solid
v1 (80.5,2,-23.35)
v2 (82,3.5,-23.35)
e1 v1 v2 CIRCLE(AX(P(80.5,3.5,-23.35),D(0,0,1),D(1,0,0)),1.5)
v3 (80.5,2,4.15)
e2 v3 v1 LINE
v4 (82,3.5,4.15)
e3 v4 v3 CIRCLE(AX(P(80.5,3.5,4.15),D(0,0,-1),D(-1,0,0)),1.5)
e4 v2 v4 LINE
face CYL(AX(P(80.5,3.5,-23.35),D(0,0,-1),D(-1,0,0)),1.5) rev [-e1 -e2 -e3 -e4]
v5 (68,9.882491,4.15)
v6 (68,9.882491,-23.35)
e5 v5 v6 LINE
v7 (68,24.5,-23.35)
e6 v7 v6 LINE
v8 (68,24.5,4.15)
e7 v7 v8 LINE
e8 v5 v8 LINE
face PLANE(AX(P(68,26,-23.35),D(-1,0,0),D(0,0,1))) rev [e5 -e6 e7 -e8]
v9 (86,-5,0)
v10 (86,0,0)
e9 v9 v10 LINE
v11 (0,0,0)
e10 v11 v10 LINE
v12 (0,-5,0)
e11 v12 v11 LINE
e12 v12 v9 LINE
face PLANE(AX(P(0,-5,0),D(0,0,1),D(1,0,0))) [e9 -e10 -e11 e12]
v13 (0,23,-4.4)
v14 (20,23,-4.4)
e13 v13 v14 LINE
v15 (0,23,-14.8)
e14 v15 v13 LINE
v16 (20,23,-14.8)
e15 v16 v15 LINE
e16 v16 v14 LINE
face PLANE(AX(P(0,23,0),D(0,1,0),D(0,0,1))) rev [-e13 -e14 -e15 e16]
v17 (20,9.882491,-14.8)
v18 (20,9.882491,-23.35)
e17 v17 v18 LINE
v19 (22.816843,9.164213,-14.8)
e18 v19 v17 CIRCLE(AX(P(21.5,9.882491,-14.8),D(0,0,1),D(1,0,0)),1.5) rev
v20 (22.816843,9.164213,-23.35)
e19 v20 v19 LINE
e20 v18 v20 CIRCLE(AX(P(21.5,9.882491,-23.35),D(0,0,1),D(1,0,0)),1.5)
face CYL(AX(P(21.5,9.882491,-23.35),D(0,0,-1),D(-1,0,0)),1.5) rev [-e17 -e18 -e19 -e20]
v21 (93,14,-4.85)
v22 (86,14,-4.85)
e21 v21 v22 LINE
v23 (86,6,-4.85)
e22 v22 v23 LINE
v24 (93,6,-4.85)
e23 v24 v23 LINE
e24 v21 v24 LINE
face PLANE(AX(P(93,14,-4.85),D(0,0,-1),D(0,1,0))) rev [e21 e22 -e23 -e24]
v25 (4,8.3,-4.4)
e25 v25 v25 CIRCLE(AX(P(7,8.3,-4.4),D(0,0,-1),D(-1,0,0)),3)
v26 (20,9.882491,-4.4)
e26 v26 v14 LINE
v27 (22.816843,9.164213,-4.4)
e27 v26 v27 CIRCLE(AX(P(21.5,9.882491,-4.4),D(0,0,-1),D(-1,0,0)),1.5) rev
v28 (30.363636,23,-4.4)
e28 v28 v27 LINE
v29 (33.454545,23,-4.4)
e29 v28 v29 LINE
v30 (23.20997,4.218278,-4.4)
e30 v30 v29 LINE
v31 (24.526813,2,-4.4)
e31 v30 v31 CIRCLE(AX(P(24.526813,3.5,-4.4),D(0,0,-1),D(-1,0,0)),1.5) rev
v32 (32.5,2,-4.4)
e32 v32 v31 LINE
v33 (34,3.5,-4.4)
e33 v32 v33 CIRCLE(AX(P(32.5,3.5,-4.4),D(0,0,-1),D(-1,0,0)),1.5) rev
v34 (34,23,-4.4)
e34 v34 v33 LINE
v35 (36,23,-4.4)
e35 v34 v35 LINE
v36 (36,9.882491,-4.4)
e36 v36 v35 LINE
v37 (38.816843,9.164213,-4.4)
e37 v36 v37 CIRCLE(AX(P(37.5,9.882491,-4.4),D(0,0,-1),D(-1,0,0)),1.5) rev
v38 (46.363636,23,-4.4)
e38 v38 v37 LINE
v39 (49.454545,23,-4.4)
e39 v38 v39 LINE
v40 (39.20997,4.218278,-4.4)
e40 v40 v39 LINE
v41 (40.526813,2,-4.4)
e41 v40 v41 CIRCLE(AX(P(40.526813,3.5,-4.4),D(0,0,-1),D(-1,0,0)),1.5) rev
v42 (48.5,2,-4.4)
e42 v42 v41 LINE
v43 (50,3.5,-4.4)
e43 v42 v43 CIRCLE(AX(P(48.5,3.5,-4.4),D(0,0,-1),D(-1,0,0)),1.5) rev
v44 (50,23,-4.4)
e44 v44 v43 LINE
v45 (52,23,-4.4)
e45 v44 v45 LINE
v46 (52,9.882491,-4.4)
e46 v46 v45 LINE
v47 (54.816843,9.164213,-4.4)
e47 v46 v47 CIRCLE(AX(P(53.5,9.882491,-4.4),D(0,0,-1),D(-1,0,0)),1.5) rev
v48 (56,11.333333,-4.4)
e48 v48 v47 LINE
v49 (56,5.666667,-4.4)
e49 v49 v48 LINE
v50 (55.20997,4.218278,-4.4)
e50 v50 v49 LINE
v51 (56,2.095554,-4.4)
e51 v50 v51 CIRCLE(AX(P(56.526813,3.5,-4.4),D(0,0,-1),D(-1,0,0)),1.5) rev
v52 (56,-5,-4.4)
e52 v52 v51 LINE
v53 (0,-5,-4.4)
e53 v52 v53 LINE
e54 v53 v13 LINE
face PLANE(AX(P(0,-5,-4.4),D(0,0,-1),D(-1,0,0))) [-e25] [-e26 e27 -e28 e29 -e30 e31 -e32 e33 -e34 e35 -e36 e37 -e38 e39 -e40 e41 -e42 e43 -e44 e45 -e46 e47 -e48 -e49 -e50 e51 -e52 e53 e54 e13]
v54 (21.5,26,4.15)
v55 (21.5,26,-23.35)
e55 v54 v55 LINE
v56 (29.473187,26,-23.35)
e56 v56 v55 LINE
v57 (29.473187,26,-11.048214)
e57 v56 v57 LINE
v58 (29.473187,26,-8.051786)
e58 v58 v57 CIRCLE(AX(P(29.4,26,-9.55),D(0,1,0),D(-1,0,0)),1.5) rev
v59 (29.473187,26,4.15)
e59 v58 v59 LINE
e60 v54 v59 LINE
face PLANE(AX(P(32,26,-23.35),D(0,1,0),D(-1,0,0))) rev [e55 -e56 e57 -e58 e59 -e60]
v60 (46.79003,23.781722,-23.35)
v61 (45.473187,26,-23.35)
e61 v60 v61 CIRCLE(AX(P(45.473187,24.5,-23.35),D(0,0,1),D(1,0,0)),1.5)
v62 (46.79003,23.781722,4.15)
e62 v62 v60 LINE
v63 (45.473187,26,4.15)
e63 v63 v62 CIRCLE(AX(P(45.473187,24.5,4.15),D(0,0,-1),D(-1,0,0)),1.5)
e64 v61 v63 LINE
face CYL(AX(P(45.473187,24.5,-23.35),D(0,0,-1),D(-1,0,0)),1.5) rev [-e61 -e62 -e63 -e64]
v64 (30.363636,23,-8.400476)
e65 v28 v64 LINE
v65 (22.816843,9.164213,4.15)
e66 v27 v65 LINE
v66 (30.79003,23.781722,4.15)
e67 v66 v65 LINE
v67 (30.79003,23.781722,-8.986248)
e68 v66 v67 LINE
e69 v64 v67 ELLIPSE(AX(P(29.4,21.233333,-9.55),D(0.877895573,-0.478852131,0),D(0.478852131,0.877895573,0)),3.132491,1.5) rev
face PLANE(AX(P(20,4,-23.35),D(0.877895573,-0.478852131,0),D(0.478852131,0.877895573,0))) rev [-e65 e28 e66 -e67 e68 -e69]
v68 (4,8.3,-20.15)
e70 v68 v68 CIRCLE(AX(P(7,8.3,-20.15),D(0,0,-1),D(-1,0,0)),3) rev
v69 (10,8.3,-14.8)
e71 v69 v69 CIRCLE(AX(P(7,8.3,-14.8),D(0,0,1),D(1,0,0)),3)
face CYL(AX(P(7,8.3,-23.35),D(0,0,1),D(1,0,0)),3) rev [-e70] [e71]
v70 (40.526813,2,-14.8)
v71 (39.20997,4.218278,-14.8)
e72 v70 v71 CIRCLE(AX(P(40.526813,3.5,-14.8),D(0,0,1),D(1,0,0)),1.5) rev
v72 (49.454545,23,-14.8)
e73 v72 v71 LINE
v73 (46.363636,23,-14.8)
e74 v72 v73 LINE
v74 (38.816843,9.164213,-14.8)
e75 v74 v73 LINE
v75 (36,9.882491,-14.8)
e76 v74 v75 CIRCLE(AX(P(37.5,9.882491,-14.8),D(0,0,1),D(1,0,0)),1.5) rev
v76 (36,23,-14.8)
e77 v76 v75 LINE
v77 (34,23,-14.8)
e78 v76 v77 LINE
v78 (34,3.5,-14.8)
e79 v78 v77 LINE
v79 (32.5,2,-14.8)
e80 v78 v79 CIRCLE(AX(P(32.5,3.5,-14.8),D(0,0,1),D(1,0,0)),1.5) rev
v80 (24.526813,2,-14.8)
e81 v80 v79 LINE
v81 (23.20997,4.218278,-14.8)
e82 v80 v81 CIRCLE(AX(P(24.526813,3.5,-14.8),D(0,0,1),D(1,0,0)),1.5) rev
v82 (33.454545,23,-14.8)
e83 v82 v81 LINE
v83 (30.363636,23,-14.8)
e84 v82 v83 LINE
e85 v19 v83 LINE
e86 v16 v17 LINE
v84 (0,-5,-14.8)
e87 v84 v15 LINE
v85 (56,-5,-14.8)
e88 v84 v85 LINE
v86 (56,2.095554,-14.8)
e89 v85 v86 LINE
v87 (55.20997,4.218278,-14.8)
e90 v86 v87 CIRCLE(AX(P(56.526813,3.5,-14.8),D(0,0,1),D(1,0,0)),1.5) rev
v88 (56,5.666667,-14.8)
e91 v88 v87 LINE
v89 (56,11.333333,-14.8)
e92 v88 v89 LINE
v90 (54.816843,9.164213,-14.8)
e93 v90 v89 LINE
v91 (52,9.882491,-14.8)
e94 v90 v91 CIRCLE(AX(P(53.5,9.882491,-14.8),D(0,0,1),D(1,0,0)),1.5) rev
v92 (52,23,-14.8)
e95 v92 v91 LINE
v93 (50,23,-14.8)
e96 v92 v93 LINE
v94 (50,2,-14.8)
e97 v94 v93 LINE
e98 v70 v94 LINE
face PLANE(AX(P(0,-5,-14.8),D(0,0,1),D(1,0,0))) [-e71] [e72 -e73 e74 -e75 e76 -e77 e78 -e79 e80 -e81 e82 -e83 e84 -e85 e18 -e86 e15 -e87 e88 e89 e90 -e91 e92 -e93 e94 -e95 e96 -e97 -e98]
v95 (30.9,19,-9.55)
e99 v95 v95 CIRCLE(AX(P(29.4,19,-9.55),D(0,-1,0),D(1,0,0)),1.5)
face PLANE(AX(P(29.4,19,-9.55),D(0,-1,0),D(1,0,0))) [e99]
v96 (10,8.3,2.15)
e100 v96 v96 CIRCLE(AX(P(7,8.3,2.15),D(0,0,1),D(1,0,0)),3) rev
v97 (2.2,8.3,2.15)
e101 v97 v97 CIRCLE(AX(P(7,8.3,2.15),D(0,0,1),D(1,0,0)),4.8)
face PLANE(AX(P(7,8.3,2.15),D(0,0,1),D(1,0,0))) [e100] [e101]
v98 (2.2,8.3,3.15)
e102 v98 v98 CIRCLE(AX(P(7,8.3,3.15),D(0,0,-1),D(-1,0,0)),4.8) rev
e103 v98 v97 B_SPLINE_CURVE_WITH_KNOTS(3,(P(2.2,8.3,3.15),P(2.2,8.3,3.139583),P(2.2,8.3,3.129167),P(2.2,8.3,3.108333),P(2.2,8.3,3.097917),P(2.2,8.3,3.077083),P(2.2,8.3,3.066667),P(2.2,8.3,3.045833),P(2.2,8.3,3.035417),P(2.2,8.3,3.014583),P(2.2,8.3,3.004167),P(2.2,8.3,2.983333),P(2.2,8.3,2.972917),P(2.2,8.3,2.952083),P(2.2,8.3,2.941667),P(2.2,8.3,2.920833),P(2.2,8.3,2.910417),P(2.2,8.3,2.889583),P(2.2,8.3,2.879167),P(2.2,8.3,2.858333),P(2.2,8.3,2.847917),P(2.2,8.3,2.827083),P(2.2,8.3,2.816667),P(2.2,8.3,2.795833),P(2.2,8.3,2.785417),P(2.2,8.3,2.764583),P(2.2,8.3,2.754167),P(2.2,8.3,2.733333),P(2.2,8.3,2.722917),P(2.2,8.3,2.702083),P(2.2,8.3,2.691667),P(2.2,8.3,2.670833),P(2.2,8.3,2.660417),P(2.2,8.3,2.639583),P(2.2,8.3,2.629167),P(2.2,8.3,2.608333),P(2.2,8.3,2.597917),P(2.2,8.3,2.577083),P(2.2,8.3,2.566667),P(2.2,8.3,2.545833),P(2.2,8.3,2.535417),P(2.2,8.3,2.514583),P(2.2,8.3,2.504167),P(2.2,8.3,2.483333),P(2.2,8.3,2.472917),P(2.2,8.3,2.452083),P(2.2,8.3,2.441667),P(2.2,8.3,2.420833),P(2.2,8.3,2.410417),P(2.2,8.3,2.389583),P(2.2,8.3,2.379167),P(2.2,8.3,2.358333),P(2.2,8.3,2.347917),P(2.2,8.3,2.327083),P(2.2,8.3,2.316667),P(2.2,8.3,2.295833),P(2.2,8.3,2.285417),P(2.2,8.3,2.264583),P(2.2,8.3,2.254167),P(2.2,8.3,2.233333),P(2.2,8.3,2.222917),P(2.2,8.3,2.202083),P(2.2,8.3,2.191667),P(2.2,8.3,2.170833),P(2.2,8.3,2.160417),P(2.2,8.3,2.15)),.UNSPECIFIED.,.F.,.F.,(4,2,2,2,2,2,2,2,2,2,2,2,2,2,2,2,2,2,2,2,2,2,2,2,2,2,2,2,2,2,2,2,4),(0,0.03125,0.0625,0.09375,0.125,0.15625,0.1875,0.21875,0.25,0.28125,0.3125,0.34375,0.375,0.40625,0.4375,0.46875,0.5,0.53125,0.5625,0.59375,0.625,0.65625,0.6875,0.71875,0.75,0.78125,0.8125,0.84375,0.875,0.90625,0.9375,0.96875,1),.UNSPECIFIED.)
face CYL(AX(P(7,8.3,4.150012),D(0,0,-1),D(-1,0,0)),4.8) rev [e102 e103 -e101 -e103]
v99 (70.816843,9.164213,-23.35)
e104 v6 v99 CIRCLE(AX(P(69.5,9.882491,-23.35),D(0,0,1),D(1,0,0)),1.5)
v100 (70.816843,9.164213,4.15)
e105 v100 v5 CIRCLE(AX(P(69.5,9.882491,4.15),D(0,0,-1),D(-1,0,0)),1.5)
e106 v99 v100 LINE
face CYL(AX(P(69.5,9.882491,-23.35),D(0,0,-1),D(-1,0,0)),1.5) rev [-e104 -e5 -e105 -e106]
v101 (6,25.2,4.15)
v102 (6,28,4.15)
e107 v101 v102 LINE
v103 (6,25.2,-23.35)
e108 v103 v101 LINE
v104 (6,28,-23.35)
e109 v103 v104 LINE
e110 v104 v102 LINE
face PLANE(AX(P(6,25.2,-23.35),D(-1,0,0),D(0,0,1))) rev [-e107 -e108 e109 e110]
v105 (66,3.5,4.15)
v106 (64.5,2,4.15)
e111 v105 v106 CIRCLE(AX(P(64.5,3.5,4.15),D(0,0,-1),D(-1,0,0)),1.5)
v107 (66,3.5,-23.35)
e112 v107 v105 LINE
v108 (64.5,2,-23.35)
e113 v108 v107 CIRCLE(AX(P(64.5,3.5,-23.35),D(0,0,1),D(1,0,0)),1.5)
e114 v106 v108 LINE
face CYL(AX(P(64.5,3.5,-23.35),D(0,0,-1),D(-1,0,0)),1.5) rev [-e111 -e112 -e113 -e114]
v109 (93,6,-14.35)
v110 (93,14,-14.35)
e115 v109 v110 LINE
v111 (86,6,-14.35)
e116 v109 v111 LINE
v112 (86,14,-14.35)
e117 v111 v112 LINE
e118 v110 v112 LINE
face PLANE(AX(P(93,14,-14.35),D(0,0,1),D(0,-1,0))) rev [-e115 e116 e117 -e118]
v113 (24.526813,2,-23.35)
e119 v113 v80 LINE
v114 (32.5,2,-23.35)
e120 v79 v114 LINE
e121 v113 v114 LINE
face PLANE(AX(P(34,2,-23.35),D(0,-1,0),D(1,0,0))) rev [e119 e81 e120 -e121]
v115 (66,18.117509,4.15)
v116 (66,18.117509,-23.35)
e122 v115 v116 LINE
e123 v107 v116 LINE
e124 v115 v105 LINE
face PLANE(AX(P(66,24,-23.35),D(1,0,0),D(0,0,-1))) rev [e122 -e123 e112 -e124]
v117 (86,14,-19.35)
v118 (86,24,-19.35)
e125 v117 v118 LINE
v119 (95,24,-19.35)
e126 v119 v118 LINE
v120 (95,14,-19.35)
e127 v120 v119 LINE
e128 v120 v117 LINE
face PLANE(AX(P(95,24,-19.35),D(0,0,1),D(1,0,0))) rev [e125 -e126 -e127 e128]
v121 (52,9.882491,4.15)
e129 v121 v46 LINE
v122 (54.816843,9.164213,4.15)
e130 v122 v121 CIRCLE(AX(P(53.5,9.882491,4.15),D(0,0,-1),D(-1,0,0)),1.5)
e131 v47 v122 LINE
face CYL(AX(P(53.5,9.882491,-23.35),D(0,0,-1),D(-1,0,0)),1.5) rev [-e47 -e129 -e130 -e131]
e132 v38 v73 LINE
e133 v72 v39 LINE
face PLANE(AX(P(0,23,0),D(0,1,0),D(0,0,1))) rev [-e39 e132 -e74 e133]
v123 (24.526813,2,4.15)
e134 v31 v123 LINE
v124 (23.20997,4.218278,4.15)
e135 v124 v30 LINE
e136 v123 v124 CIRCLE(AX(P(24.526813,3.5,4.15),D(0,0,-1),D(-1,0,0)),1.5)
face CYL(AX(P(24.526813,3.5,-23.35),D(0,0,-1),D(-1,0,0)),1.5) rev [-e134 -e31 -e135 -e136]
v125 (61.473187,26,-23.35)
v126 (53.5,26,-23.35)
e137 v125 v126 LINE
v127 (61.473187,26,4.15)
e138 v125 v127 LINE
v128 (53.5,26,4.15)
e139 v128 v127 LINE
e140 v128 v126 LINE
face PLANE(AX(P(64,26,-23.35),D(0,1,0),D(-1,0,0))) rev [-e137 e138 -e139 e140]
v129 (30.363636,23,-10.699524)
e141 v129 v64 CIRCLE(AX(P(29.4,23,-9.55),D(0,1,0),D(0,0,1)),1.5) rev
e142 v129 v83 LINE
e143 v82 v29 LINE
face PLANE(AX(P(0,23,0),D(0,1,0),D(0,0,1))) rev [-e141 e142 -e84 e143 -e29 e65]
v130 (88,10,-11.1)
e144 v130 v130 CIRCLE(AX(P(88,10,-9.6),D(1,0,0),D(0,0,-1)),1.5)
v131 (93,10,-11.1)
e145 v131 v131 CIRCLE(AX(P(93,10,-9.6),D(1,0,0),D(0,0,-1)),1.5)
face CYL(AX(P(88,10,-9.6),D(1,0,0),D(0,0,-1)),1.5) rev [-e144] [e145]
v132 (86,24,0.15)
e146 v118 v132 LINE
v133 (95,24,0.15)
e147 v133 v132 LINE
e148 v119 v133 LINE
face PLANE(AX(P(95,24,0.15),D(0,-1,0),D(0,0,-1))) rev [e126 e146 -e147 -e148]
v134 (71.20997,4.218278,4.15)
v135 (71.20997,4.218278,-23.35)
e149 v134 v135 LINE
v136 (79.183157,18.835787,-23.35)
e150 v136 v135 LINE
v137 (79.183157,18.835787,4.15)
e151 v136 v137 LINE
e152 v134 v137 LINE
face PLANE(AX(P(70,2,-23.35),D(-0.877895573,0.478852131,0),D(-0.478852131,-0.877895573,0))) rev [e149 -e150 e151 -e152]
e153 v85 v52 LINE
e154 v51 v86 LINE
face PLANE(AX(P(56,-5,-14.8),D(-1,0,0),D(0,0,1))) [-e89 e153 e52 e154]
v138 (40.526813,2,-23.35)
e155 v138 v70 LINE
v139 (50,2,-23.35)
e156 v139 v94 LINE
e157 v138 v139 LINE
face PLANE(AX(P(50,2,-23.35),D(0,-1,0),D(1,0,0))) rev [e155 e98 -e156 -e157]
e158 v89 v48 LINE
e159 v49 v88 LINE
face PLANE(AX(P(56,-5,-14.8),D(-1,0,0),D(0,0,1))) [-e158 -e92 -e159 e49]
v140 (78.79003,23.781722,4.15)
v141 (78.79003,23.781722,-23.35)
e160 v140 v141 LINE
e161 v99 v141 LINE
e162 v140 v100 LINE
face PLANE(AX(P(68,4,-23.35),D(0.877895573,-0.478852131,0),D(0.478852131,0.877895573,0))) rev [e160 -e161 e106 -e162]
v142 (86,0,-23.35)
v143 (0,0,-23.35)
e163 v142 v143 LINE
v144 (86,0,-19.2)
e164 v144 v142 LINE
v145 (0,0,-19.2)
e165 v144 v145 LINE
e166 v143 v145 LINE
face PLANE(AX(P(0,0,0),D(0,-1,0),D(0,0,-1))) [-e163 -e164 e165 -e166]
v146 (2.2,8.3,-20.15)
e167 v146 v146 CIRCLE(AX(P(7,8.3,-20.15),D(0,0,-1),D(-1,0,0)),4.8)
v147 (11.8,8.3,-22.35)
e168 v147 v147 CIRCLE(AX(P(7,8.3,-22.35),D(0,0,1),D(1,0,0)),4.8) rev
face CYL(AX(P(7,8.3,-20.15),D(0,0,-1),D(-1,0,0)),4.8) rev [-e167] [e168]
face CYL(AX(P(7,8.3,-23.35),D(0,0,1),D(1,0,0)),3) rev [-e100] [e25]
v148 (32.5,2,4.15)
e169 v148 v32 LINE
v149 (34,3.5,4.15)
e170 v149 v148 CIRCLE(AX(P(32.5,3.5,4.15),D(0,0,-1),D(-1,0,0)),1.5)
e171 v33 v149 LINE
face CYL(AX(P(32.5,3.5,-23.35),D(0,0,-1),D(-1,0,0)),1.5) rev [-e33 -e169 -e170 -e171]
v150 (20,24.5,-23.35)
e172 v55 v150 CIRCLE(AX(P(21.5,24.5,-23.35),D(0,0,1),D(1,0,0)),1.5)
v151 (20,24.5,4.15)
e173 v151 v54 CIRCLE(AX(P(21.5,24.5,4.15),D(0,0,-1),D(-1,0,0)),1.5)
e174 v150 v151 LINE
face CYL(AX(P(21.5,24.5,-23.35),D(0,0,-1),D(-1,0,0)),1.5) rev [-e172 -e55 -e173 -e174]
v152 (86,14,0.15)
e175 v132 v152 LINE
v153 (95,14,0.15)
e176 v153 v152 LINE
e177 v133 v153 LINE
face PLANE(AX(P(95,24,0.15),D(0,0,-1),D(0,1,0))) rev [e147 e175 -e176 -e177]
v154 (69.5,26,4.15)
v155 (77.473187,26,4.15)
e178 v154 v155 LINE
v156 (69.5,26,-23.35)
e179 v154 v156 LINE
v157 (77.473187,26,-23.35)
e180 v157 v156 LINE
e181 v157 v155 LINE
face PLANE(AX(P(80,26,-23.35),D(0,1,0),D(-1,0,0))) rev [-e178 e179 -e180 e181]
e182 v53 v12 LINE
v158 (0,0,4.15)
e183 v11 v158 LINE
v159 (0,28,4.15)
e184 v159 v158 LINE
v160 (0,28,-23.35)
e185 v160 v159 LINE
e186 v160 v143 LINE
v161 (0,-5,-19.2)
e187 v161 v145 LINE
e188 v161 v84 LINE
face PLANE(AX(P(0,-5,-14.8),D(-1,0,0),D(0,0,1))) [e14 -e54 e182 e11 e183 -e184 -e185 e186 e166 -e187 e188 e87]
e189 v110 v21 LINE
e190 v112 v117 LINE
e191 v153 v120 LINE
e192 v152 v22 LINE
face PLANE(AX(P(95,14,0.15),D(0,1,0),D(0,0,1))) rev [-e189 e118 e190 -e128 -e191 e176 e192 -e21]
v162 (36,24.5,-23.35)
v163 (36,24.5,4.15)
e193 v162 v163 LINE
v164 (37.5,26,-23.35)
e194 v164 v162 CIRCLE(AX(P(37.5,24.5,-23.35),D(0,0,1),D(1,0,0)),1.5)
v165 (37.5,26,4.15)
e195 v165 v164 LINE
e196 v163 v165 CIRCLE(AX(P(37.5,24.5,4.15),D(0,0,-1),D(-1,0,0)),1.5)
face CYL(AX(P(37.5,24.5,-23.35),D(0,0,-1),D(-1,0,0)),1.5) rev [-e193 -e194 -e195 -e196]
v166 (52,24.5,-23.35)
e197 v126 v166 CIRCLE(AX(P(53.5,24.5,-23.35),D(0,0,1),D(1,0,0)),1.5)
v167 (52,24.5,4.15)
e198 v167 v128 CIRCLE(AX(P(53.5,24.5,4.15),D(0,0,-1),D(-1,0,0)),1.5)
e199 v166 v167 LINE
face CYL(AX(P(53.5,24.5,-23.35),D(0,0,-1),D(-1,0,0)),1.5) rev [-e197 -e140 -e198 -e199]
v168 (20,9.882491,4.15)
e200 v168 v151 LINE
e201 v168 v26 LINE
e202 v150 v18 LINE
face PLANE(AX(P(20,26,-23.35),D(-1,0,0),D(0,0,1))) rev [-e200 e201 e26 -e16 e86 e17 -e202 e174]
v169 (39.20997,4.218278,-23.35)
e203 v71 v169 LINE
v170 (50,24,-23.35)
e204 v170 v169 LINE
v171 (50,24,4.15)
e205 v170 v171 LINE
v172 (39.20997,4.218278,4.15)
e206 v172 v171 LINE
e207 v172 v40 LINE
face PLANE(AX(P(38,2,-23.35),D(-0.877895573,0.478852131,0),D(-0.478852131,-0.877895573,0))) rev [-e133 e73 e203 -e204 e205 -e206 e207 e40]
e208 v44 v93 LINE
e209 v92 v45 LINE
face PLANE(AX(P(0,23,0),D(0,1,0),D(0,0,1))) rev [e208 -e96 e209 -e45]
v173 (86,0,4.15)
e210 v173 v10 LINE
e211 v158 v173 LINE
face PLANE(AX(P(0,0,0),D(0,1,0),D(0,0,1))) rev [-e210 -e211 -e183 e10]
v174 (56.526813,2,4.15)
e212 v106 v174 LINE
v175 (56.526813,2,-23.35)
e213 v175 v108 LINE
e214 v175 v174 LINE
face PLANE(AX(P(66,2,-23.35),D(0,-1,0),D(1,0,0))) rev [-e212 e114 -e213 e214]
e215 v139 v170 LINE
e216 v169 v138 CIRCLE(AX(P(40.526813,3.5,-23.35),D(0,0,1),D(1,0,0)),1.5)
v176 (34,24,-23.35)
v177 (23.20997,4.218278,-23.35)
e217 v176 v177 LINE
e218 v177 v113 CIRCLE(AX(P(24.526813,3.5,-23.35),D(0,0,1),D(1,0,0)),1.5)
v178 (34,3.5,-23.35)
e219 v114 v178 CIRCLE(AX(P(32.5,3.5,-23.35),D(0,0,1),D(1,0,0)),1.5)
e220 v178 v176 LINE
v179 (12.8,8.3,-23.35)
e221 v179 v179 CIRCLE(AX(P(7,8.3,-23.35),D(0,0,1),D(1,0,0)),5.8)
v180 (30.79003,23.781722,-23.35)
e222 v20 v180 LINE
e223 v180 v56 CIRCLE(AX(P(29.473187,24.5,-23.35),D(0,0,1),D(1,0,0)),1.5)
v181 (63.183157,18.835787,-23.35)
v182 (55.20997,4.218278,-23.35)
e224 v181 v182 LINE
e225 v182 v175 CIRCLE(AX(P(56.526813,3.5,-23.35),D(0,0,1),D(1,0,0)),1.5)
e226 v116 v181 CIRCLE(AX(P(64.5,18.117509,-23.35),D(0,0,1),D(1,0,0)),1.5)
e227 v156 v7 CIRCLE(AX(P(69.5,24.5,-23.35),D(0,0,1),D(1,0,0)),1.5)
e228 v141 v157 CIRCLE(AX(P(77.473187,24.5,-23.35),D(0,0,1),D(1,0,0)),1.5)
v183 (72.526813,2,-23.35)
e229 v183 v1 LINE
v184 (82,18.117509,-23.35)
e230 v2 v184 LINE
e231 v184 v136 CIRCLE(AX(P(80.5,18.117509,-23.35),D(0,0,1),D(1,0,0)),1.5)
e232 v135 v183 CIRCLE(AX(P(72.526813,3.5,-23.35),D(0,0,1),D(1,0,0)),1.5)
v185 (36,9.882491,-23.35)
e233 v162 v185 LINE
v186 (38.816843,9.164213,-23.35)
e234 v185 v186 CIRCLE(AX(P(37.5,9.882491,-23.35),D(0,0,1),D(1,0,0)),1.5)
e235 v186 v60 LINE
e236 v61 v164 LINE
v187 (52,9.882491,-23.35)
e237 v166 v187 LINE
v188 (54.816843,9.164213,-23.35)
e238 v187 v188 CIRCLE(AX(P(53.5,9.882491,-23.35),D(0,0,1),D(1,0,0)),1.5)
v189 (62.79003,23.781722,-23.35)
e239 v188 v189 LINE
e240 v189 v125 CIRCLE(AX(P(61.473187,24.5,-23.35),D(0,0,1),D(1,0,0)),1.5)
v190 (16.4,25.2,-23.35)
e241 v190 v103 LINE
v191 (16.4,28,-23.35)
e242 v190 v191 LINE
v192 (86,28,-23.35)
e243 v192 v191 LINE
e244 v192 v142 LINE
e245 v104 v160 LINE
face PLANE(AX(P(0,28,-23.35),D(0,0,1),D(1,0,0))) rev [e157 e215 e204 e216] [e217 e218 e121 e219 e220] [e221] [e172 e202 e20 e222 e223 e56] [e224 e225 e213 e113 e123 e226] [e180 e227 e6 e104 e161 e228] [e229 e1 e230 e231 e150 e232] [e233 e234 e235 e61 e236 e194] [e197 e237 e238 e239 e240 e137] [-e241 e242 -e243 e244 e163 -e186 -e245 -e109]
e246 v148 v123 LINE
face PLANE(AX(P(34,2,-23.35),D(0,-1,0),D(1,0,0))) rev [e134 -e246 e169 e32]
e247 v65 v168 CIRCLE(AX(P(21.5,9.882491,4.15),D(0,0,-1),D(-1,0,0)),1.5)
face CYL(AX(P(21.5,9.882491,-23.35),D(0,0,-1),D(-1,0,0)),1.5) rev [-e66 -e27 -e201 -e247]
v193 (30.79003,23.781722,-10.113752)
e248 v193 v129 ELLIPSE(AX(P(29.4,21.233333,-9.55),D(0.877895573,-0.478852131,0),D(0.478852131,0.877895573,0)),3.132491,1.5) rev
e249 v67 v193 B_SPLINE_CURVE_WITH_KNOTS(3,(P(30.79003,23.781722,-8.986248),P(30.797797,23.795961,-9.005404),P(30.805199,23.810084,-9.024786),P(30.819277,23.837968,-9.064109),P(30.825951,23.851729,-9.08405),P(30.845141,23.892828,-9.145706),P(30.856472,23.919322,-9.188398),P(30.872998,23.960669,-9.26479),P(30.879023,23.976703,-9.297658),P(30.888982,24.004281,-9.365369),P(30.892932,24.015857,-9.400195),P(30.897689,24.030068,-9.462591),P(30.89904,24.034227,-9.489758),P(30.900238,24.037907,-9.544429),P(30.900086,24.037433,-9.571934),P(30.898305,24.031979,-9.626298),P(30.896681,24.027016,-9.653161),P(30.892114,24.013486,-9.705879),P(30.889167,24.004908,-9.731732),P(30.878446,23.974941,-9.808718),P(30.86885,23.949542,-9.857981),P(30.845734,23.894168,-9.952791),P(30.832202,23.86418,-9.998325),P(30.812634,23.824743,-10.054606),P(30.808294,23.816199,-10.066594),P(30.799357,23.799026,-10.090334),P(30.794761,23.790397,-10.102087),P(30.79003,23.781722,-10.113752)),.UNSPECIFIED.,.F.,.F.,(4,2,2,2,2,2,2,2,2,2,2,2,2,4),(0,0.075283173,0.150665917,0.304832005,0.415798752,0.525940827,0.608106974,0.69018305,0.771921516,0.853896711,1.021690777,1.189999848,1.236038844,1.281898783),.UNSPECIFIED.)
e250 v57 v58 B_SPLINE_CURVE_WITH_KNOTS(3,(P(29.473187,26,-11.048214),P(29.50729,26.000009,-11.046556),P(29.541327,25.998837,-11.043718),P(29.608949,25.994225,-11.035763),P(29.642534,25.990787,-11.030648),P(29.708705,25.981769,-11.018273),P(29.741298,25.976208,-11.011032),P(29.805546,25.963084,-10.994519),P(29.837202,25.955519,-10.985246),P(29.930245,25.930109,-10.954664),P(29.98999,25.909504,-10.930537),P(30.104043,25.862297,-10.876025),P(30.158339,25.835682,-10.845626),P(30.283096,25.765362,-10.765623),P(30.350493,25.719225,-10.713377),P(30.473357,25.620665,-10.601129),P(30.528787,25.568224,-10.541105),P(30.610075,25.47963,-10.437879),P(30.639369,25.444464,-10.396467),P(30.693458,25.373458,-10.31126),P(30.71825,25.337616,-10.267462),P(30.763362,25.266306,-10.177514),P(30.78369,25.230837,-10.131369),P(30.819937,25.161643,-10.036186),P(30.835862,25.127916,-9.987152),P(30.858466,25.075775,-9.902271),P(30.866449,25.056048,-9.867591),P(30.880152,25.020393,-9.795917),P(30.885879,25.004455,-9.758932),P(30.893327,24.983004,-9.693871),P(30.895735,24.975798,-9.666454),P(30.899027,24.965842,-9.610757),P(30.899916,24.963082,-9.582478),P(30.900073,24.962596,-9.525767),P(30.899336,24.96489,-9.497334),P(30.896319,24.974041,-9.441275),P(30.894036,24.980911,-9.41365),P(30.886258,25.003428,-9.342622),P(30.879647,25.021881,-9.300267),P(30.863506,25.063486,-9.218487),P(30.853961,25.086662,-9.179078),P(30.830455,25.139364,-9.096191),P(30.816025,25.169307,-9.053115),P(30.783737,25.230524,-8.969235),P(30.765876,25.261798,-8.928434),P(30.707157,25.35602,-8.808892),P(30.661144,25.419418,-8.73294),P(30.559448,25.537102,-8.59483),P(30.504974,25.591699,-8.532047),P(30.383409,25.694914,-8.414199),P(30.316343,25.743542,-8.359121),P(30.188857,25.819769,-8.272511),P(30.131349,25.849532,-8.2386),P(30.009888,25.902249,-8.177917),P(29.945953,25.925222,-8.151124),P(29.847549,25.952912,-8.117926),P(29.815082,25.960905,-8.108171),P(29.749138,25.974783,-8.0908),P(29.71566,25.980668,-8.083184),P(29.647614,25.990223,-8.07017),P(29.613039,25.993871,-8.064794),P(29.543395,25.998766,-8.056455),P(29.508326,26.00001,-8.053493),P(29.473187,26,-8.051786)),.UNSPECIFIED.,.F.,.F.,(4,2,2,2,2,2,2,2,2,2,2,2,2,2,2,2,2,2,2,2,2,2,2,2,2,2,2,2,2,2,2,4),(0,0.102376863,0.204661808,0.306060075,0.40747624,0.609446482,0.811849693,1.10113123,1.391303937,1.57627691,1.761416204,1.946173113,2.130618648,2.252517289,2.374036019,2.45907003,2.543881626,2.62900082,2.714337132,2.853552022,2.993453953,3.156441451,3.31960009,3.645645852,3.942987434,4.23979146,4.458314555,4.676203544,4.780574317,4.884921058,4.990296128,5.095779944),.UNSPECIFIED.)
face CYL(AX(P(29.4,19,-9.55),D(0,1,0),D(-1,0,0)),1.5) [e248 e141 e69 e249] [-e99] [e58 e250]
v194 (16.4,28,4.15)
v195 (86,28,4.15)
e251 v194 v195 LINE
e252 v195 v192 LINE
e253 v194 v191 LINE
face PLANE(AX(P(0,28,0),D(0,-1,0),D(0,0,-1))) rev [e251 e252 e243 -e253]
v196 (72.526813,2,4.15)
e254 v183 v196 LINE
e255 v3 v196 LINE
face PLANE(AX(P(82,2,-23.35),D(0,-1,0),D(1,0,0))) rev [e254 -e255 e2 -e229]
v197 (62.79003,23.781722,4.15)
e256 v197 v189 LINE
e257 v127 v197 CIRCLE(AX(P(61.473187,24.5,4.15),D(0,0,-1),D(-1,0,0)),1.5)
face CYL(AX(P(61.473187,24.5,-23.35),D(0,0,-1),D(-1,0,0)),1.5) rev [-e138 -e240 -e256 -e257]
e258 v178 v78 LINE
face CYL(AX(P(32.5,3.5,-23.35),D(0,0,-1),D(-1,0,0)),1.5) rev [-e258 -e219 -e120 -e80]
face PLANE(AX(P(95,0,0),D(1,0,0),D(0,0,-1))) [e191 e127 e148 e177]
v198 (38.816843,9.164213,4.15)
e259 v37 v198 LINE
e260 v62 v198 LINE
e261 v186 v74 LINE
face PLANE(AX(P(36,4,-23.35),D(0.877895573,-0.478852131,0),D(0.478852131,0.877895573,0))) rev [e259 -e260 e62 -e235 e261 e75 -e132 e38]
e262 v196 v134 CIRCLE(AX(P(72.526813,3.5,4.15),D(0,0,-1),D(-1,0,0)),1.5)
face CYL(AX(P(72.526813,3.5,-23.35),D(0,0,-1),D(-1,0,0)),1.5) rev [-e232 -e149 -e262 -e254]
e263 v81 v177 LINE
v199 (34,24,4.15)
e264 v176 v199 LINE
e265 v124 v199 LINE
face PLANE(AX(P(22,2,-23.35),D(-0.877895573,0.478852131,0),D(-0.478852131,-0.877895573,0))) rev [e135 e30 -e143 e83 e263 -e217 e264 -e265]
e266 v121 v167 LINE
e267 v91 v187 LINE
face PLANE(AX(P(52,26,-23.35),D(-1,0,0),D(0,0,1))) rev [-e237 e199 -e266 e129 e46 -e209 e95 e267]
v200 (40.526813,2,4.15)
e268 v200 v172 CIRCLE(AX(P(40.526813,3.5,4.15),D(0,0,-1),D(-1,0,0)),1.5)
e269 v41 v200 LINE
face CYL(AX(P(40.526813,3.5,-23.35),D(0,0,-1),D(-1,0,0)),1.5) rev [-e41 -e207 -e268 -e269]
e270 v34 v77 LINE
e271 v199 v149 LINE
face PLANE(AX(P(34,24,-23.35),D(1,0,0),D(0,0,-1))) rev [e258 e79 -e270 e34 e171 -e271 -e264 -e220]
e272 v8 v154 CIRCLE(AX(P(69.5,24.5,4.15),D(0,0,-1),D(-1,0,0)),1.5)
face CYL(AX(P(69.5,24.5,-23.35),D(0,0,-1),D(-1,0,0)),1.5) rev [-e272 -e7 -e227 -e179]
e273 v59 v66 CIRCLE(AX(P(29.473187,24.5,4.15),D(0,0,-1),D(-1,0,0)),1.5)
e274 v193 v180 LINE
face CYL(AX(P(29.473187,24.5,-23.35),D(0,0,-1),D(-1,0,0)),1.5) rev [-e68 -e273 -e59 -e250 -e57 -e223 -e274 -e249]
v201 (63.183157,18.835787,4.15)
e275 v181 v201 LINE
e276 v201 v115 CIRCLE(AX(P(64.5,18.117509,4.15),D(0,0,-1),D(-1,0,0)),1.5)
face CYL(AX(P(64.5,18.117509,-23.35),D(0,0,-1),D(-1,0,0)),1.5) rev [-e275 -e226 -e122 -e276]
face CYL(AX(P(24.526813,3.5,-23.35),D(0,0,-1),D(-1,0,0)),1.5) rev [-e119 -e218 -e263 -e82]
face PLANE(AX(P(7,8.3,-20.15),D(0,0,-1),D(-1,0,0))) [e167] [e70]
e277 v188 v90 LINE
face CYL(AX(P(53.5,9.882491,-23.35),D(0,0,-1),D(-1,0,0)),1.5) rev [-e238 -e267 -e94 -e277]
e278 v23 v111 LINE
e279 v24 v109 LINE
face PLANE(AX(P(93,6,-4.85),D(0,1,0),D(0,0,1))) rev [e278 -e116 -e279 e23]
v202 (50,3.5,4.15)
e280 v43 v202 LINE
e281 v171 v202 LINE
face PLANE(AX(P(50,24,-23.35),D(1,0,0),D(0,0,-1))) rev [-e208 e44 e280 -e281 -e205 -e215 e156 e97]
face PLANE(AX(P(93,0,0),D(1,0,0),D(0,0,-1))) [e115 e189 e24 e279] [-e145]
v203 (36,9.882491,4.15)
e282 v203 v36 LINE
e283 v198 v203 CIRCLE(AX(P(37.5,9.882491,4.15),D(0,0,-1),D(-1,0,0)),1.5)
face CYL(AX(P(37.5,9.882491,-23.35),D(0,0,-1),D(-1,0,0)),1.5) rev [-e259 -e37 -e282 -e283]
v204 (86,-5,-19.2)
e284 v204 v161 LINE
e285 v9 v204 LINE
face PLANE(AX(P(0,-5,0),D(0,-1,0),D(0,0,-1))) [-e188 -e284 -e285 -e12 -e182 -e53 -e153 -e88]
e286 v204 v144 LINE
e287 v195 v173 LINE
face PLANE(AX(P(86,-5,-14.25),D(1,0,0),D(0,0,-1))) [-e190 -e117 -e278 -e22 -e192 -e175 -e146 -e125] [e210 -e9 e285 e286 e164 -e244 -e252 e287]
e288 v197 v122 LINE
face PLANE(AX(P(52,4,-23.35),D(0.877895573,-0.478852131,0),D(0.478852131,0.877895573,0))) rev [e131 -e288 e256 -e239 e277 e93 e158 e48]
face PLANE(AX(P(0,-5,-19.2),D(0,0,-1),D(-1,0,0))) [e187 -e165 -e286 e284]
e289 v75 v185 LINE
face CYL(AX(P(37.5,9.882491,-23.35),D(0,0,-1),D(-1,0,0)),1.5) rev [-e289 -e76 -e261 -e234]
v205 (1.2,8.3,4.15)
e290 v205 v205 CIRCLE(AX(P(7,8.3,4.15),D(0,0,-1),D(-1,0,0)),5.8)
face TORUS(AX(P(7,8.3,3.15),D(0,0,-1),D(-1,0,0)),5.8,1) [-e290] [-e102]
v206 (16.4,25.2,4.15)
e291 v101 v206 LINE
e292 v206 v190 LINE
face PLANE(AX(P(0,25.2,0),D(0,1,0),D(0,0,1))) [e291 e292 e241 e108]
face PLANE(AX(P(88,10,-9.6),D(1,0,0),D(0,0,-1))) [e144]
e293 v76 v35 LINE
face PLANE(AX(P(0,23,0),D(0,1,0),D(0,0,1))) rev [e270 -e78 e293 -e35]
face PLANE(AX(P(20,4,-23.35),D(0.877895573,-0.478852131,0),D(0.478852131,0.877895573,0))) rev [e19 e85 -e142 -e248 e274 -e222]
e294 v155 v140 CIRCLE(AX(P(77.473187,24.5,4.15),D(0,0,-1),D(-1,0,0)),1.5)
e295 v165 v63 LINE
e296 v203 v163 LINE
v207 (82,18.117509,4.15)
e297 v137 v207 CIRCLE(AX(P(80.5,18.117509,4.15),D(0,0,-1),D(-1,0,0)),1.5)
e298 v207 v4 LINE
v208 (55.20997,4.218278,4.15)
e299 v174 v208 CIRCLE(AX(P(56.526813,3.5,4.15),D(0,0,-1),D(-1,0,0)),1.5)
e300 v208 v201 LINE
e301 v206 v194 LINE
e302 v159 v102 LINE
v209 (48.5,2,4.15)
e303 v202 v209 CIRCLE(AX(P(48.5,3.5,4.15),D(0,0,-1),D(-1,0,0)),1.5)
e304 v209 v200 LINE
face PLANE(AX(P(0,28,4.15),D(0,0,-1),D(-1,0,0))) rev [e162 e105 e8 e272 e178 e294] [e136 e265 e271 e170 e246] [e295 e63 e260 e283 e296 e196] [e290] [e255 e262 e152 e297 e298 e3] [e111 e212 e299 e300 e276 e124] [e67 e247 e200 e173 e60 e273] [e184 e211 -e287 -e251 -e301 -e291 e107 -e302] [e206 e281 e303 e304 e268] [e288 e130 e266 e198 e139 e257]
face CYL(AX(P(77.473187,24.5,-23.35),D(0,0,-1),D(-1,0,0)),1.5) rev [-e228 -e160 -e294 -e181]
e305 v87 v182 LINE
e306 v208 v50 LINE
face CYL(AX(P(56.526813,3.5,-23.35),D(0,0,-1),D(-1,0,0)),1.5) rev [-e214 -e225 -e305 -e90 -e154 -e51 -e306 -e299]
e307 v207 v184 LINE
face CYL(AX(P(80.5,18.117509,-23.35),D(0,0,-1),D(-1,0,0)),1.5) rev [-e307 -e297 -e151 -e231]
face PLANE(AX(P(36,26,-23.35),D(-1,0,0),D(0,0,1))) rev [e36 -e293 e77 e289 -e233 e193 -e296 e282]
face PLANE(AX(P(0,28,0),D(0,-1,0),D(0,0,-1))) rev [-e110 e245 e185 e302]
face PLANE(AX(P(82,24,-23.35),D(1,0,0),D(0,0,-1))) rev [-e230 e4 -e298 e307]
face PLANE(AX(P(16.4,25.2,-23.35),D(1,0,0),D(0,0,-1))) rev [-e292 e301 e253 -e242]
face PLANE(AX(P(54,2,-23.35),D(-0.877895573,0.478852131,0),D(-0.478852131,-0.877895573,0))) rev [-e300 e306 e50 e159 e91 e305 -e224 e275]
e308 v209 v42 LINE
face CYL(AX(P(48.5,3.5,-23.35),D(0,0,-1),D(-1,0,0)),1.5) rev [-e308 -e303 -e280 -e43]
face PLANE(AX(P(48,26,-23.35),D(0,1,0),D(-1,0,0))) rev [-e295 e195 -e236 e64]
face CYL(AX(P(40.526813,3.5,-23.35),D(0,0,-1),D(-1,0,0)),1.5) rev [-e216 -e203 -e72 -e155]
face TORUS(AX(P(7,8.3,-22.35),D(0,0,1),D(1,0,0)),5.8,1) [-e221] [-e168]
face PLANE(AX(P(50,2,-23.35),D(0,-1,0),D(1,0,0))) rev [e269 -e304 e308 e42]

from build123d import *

# Parameters (mm, degrees)
BOSS_EXTRUDE2_DEPTH     = 5
SKETCH3_W               = 56
SKETCH3_H               = 8.55
BOSS_EXTRUDE3_DEPTH     = 28
CUT_EXTRUDE1_DEPTH      = 95.531740701
CUT_EXTRUDE1_DEPTH_BACK = 95.531740701
SKETCH4_R               = 3
CUT_EXTRUDE2_DEPTH      = 95.531740701
CUT_EXTRUDE2_DEPTH_BACK = 2
SKETCH5_R               = 4.8
CUT_EXTRUDE3_START      = -3.2
SKETCH6_R               = 4.8
CUT_EXTRUDE3_DEPTH      = 3.2
SKETCH7_W               = 56
SKETCH7_H               = 10.4
BOSS_EXTRUDE4_DEPTH     = 5
SKETCH8_W               = 30
SKETCH8_H               = 27.5
BOSS_EXTRUDE5_DEPTH     = 28
CUT_EXTRUDE4_DEPTH      = 95.531740701
LPATTERN1_COUNT         = 4
LPATTERN1_PITCH         = 16
SKETCH11_R              = 1.5
BOSS_EXTRUDE6_DEPTH     = 7
FILLET1_R               = 1.5
SKETCH13_W              = 19.5
SKETCH13_H              = 10
BOSS_EXTRUDE7_DEPTH     = 9
SKETCH14_W              = 9.5
SKETCH14_H              = 8
BOSS_EXTRUDE8_DEPTH     = 7
SKETCH15_R              = 1.5
CUT_EXTRUDE5_DEPTH      = 5
SKETCH16_W              = 10.4
SKETCH16_H              = 27.5
CUT_EXTRUDE6_DEPTH      = 2.8
FILLET2_R               = 1


with BuildPart() as part:
    # Sketch2 → Boss-Extrude2 (new body)
    with BuildSketch(Plane(origin=(0, 0, 0), x_dir=(1, 0, 0), z_dir=(0, 1, 0))):
        Polygon((0, 0), (86, 0), (86, 4.15), (86, 14.25), (86, 19.2), (0, 19.2), (0, 14.8), (56, 14.8), (56, 4.4), (0, 4.4), align=None)
    extrude(amount=-BOSS_EXTRUDE2_DEPTH)

    # Sketch3 → Boss-Extrude3 (add)
    with BuildSketch(Plane(origin=(0, 0, 0), x_dir=(1, 0, 0), z_dir=(0, 1, 0))):
        with Locations((28, 19.075)):
            Rectangle(SKETCH3_W, SKETCH3_H)
        with Locations((28, 0.125)):
            Rectangle(SKETCH3_W, SKETCH3_H)
    extrude(amount=BOSS_EXTRUDE3_DEPTH)

    # Sketch4 → Cut-Extrude1 (cut, two sides: drawn at the far end of the back side and taken through both)
    with BuildSketch(Plane.XY.offset(4.15).offset(-CUT_EXTRUDE1_DEPTH_BACK)):
        with Locations(Location((7, 8.3, 0), (0, 0, 180))):
            Circle(SKETCH4_R)
    extrude(amount=CUT_EXTRUDE1_DEPTH + CUT_EXTRUDE1_DEPTH_BACK, mode=Mode.SUBTRACT)

    # Sketch5 → Cut-Extrude2 (cut, two sides: drawn at the far end of the back side and taken through both)
    with BuildSketch(Plane.XY.offset(4.15).offset(-CUT_EXTRUDE2_DEPTH_BACK)):
        with Locations(Location((7, 8.3, 0), (0, 0, 180))):
            Circle(SKETCH5_R)
    extrude(amount=CUT_EXTRUDE2_DEPTH + CUT_EXTRUDE2_DEPTH_BACK, mode=Mode.SUBTRACT)

    # Sketch6 → Cut-Extrude3 (cut)
    with BuildSketch(Plane(origin=(0, 0, -23.35), x_dir=(-1, 0, 0), z_dir=(0, 0, -1)).offset(CUT_EXTRUDE3_START)):
        with Locations((-7, 8.3)):
            Circle(SKETCH6_R)
    extrude(amount=CUT_EXTRUDE3_DEPTH, mode=Mode.SUBTRACT)

    # Sketch7 → Boss-Extrude4 (add)
    with BuildSketch(Plane(origin=(0, 28, 0), x_dir=(1, 0, 0), z_dir=(0, 1, 0))):
        with Locations((28, 9.6)):
            Rectangle(SKETCH7_W, SKETCH7_H)
    extrude(amount=-BOSS_EXTRUDE4_DEPTH)

    # Sketch8 → Boss-Extrude5 (add)
    with BuildSketch(Plane(origin=(0, 0, 0), x_dir=(1, 0, 0), z_dir=(0, 1, 0))):
        with Locations((71, 9.6)):
            Rectangle(SKETCH8_W, SKETCH8_H)
    extrude(amount=BOSS_EXTRUDE5_DEPTH)

    # Sketch12 → Cut-Extrude4 (cut, symmetric)
    with BuildSketch(Plane.XY.offset(4.15)):
        Polygon((82, 24), (82, 2), (70, 2), align=None)
        Polygon((80, 26), (68, 26), (68, 4), align=None)
    cut_extrude4 = extrude(amount=CUT_EXTRUDE4_DEPTH, both=True, mode=Mode.SUBTRACT)

    # LPattern1: Cut-Extrude4 ×4
    with Locations(*[(-i * LPATTERN1_PITCH, 0, 0) for i in range(1, LPATTERN1_COUNT)]):
        add(cut_extrude4, mode=Mode.SUBTRACT)

    # Sketch11 → Boss-Extrude6 (add)
    with BuildSketch(Plane.XZ.offset(-26)):
        with Locations(Location((29.4, -9.55, 0), (0, 0, 180))):
            Circle(SKETCH11_R)
    extrude(amount=BOSS_EXTRUDE6_DEPTH)

    # Fillet1
    # the kernel refuses this fillet: 1.5 mm, written as the material it adds along each edge
    with BuildSketch(Plane(origin=(80, 26, 4.15), x_dir=(-1, 0, 0), z_dir=(0, 0, -1)), Plane(origin=(70, 2, -23.35), x_dir=(0.4788521306805733, 0.8778955729143845, 0), z_dir=(0, 0, 1)), Plane(origin=(48, 26, 4.15), x_dir=(-1, 0, 0), z_dir=(0, 0, -1)), Plane(origin=(64, 26, 4.15), x_dir=(-1, 0, 0), z_dir=(0, 0, -1)), Plane(origin=(32, 26, 4.15), x_dir=(-1, 0, 0), z_dir=(0, 0, -1))) as fillet1_piece_1:
        with BuildLine():
            CenterArc((FILLET1_R * 1.68454218965, -FILLET1_R), FILLET1_R, 90, 118.610459666)
            Line((FILLET1_R * 0.806646616735, -FILLET1_R * 1.47885213068), (0, 0))
            Line((0, 0), (FILLET1_R * 1.68454218965, 0))
        make_face()
    extrude(amount=27.5)
    with BuildSketch(Plane(origin=(68, 4, 4.15), x_dir=(0.4788521306805736, 0.8778955729143842, 0), z_dir=(0, 0, -1))) as fillet1_piece_2:
        with BuildLine():
            CenterArc((FILLET1_R * 3.92166068102, -FILLET1_R), FILLET1_R, 90, 151.389540334)
            Line((FILLET1_R * 3.44280855034, -FILLET1_R * 1.87789557291), (0, 0))
            Line((0, 0), (FILLET1_R * 3.92166068102, 0))
        make_face()
    extrude(amount=27.5)
    with BuildSketch(Plane(origin=(68, 26, -23.35), x_dir=(1, 0, 0), z_dir=(0, 0, 1)), Plane(origin=(36, 26, -23.35), x_dir=(1, 0, 0), z_dir=(0, 0, 1)), Plane(origin=(52, 26, -23.35), x_dir=(1, 0, 0), z_dir=(0, 0, 1)), Plane(origin=(20, 26, -23.35), x_dir=(1, 0, 0), z_dir=(0, 0, 1))) as fillet1_piece_3:
        with BuildLine():
            CenterArc((FILLET1_R, -FILLET1_R), FILLET1_R, 90, 90)
            Line((0, -FILLET1_R), (0, 0))
            Line((0, 0), (FILLET1_R, 0))
        make_face()
    extrude(amount=27.5)
    with BuildSketch(Plane(origin=(82, 24, -23.35), x_dir=(-0.47885213068057286, -0.8778955729143847, 0), z_dir=(0, 0, 1)), Plane(origin=(66, 24, -23.35), x_dir=(-0.47885213068057303, -0.8778955729143846, 0), z_dir=(0, 0, 1))) as fillet1_piece_4:
        with BuildLine():
            CenterArc((FILLET1_R * 3.92166068102, FILLET1_R), FILLET1_R, 118.610459666, 151.389540334)
            Line((FILLET1_R * 3.44280855034, FILLET1_R * 1.87789557291), (0, 0))
            Line((0, 0), (FILLET1_R * 3.92166068102, 0))
        make_face()
    extrude(amount=27.5)
    with BuildSketch(Plane(origin=(82, 2, 4.15), x_dir=(-1, 0, 0), z_dir=(0, 0, -1)), Plane(origin=(66, 2, 4.15), x_dir=(-1, 0, 0), z_dir=(0, 0, -1))) as fillet1_piece_5:
        with BuildLine():
            CenterArc((FILLET1_R, FILLET1_R), FILLET1_R, 180, 90)
            Line((0, FILLET1_R), (0, 0))
            Line((0, 0), (FILLET1_R, 0))
        make_face()
    extrude(amount=27.5)
    with BuildSketch(Plane(origin=(34, 2, 4.15), x_dir=(-1, 0, 0), z_dir=(0, 0, -1)), Plane(origin=(50, 2, 4.15), x_dir=(-1, 0, 0), z_dir=(0, 0, -1))) as fillet1_piece_6:
        with BuildLine():
            CenterArc((FILLET1_R, FILLET1_R), FILLET1_R, 180, 90)
            Line((0, FILLET1_R), (0, 0))
            Line((0, 0), (FILLET1_R, 0))
        make_face()
    extrude(amount=8.55)
    with BuildSketch(Plane(origin=(34, 2, -14.8), x_dir=(0, 1, 0), z_dir=(0, 0, -1))) as fillet1_piece_7:
        with BuildLine():
            CenterArc((FILLET1_R, -FILLET1_R), FILLET1_R, 90, 90)
            Line((0, -FILLET1_R), (0, 0))
            Line((0, 0), (FILLET1_R, 0))
        make_face()
    extrude(amount=8.55)
    with BuildSketch(Plane(origin=(22, 2, -4.4), x_dir=(0.4788521306805726, 0.8778955729143848, 0), z_dir=(0, 0, 1)), Plane(origin=(22, 2, -23.35), x_dir=(0.4788521306805726, 0.8778955729143848, 0), z_dir=(0, 0, 1)), Plane(origin=(38, 2, -4.4), x_dir=(0.4788521306805726, 0.8778955729143847, 0), z_dir=(0, 0, 1)), Plane(origin=(38, 2, -23.35), x_dir=(0.4788521306805726, 0.8778955729143847, 0), z_dir=(0, 0, 1))) as fillet1_piece_8:
        with BuildLine():
            CenterArc((FILLET1_R * 1.68454218965, -FILLET1_R), FILLET1_R, 90, 118.610459666)
            Line((FILLET1_R * 0.806646616735, -FILLET1_R * 1.47885213068), (0, 0))
            Line((0, 0), (FILLET1_R * 1.68454218965, 0))
        make_face()
    extrude(amount=8.55)
    with BuildSketch(Plane(origin=(36, 4, 4.15), x_dir=(0.47885213068057314, 0.8778955729143845, 0), z_dir=(0, 0, -1)), Plane(origin=(36, 4, -14.8), x_dir=(0.47885213068057314, 0.8778955729143845, 0), z_dir=(0, 0, -1)), Plane(origin=(52, 4, 4.15), x_dir=(0.47885213068057303, 0.8778955729143846, 0), z_dir=(0, 0, -1)), Plane(origin=(52, 4, -14.8), x_dir=(0.47885213068057303, 0.8778955729143846, 0), z_dir=(0, 0, -1))) as fillet1_piece_9:
        with BuildLine():
            CenterArc((FILLET1_R * 3.92166068102, -FILLET1_R), FILLET1_R, 90, 151.389540334)
            Line((FILLET1_R * 3.44280855034, -FILLET1_R * 1.87789557291), (0, 0))
            Line((0, 0), (FILLET1_R * 3.92166068102, 0))
        make_face()
    extrude(amount=8.55)
    with BuildSketch(Plane(origin=(36, 4, 4.15), x_dir=(0.47885213068057314, 0.8778955729143845, 0), z_dir=(0, 0, -1))) as fillet1_piece_10_section:
        with BuildLine():
            CenterArc((FILLET1_R * 3.92166068102, -FILLET1_R), FILLET1_R, 90, 151.389540334)
            Line((FILLET1_R * 3.44280855034, -FILLET1_R * 1.87789557291), (0, 0))
            Line((0, 0), (FILLET1_R * 3.92166068102, 0))
        make_face()
    fillet1_piece_10 = extrude(amount=23.256227554, mode=Mode.PRIVATE)
    fillet1_piece_10 = split(fillet1_piece_10, bisect_by=Plane(origin=(36.786949265, 7.086147992, -14.8), z_dir=(0, 0, -1)), keep=Keep.TOP, mode=Mode.PRIVATE)
    add(fillet1_piece_10)
    with BuildSketch(Plane(origin=(36, 4, -0.093772446), x_dir=(0.47885213068057314, 0.8778955729143845, 0), z_dir=(0, 0, -1))) as fillet1_piece_11_section:
        with BuildLine():
            CenterArc((FILLET1_R * 3.92166068102, -FILLET1_R), FILLET1_R, 90, 151.389540334)
            Line((FILLET1_R * 3.44280855034, -FILLET1_R * 1.87789557291), (0, 0))
            Line((0, 0), (FILLET1_R * 3.92166068102, 0))
        make_face()
    fillet1_piece_11 = extrude(amount=23.256227554, mode=Mode.PRIVATE)
    fillet1_piece_11 = split(fillet1_piece_11, bisect_by=Plane(origin=(36.786949265, 7.086147992, -4.4), z_dir=(0, 0, 1)), keep=Keep.TOP, mode=Mode.PRIVATE)
    add(fillet1_piece_11)
    with BuildSketch(Plane(origin=(52, 4, 4.15), x_dir=(0.47885213068057303, 0.8778955729143846, 0), z_dir=(0, 0, -1))) as fillet1_piece_12_section:
        with BuildLine():
            CenterArc((FILLET1_R * 3.92166068102, -FILLET1_R), FILLET1_R, 90, 151.389540334)
            Line((FILLET1_R * 3.44280855034, -FILLET1_R * 1.87789557291), (0, 0))
            Line((0, 0), (FILLET1_R * 3.92166068102, 0))
        make_face()
    fillet1_piece_12 = extrude(amount=23.256227554, mode=Mode.PRIVATE)
    fillet1_piece_12 = split(fillet1_piece_12, bisect_by=Plane(origin=(52.786949265, 7.086147992, -14.8), z_dir=(0, 0, -1)), keep=Keep.TOP, mode=Mode.PRIVATE)
    add(fillet1_piece_12)
    with BuildSketch(Plane(origin=(52, 4, -0.093772446), x_dir=(0.47885213068057303, 0.8778955729143846, 0), z_dir=(0, 0, -1))) as fillet1_piece_13_section:
        with BuildLine():
            CenterArc((FILLET1_R * 3.92166068102, -FILLET1_R), FILLET1_R, 90, 151.389540334)
            Line((FILLET1_R * 3.44280855034, -FILLET1_R * 1.87789557291), (0, 0))
            Line((0, 0), (FILLET1_R * 3.92166068102, 0))
        make_face()
    fillet1_piece_13 = extrude(amount=23.256227554, mode=Mode.PRIVATE)
    fillet1_piece_13 = split(fillet1_piece_13, bisect_by=Plane(origin=(52.786949265, 7.086147992, -4.4), z_dir=(0, 0, 1)), keep=Keep.TOP, mode=Mode.PRIVATE)
    add(fillet1_piece_13)
    with BuildSketch(Plane(origin=(20, 4, 4.15), x_dir=(0, 1, 0), z_dir=(0, 0, -1)), Plane(origin=(20, 4, -14.8), x_dir=(0, 1, 0), z_dir=(0, 0, -1))) as fillet1_piece_14:
        with BuildLine():
            CenterArc((FILLET1_R * 3.92166068102, FILLET1_R), FILLET1_R, 118.610459666, 151.389540334)
            Line((FILLET1_R * 3.44280855034, FILLET1_R * 1.87789557291), (0, 0))
            Line((0, 0), (FILLET1_R * 3.92166068102, 0))
        make_face()
    extrude(amount=8.55)
    with BuildSketch(Plane(origin=(20, 4, 4.15), x_dir=(0, 1, 0), z_dir=(0, 0, -1))) as fillet1_piece_15_section:
        with BuildLine():
            CenterArc((FILLET1_R * 3.92166068102, FILLET1_R), FILLET1_R, 118.610459666, 151.389540334)
            Line((FILLET1_R * 3.44280855034, FILLET1_R * 1.87789557291), (0, 0))
            Line((0, 0), (FILLET1_R * 3.92166068102, 0))
        make_face()
    fillet1_piece_15 = extrude(amount=23.256227554, mode=Mode.PRIVATE)
    fillet1_piece_15 = split(fillet1_piece_15, bisect_by=Plane(origin=(20.786949265, 7.086147992, -14.8), z_dir=(0, 0, -1)), keep=Keep.TOP, mode=Mode.PRIVATE)
    add(fillet1_piece_15)
    with BuildSketch(Plane(origin=(20, 4, -0.093772446), x_dir=(0, 1, 0), z_dir=(0, 0, -1))) as fillet1_piece_16_section:
        with BuildLine():
            CenterArc((FILLET1_R * 3.92166068102, FILLET1_R), FILLET1_R, 118.610459666, 151.389540334)
            Line((FILLET1_R * 3.44280855034, FILLET1_R * 1.87789557291), (0, 0))
            Line((0, 0), (FILLET1_R * 3.92166068102, 0))
        make_face()
    fillet1_piece_16 = extrude(amount=23.256227554, mode=Mode.PRIVATE)
    fillet1_piece_16 = split(fillet1_piece_16, bisect_by=Plane(origin=(20.786949265, 7.086147992, -4.4), z_dir=(0, 0, 1)), keep=Keep.TOP, mode=Mode.PRIVATE)
    add(fillet1_piece_16)
    with BuildSketch(Plane(origin=(54, 2, -10.717033211), x_dir=(0.4788521306805727, 0.8778955729143846, 0), z_dir=(0, 0, 1))) as fillet1_piece_17_section:
        with BuildLine():
            CenterArc((FILLET1_R * 1.68454218965, -FILLET1_R), FILLET1_R, 90, 118.610459666)
            Line((FILLET1_R * 0.806646616735, -FILLET1_R * 1.47885213068), (0, 0))
            Line((0, 0), (FILLET1_R * 1.68454218965, 0))
        make_face()
    fillet1_piece_17 = extrude(amount=14.867033211, mode=Mode.PRIVATE)
    fillet1_piece_17 = split(fillet1_piece_17, bisect_by=Plane(origin=(56.19558087, 2.007259132, -4.4), z_dir=(0, 0, -1)), keep=Keep.TOP, mode=Mode.PRIVATE)
    fillet1_piece_17 = split(fillet1_piece_17, bisect_by=Plane(origin=(56, 2.007259132, -7.558516606), z_dir=(1, 0, 0)), keep=Keep.TOP, mode=Mode.PRIVATE)
    add(fillet1_piece_17)
    with BuildSketch(Plane(origin=(54, 2, -4.4), x_dir=(0.4788521306805727, 0.8778955729143846, 0), z_dir=(0, 0, 1))) as fillet1_piece_18_section:
        with BuildLine():
            CenterArc((FILLET1_R * 1.68454218965, -FILLET1_R), FILLET1_R, 90, 118.610459666)
            Line((FILLET1_R * 0.806646616735, -FILLET1_R * 1.47885213068), (0, 0))
            Line((0, 0), (FILLET1_R * 1.68454218965, 0))
        make_face()
    fillet1_piece_18 = extrude(amount=8.55, mode=Mode.PRIVATE)
    fillet1_piece_18 = split(fillet1_piece_18, bisect_by=Plane(origin=(56, 2.552378246, -0.125), z_dir=(-1, 0, 0)), keep=Keep.TOP, mode=Mode.PRIVATE)
    add(fillet1_piece_18)
    with BuildSketch(Plane(origin=(54, 2, -4.4), x_dir=(0.4788521306805727, 0.8778955729143846, 0), z_dir=(0, 0, 1))) as fillet1_piece_19_section:
        with BuildLine():
            CenterArc((FILLET1_R * 1.68454218965, -FILLET1_R), FILLET1_R, 90, 118.610459666)
            Line((FILLET1_R * 0.806646616735, -FILLET1_R * 1.47885213068), (0, 0))
            Line((0, 0), (FILLET1_R * 1.68454218965, 0))
        make_face()
    fillet1_piece_19 = extrude(amount=8.55, mode=Mode.PRIVATE)
    fillet1_piece_19 = split(fillet1_piece_19, bisect_by=Plane(origin=(56, 2.007259132, -0.125), z_dir=(1, 0, 0)), keep=Keep.TOP, mode=Mode.PRIVATE)
    add(fillet1_piece_19)
    with BuildSketch(Plane(origin=(54, 2, -23.35), x_dir=(0.4788521306805727, 0.8778955729143846, 0), z_dir=(0, 0, 1))) as fillet1_piece_20_section:
        with BuildLine():
            CenterArc((FILLET1_R * 1.68454218965, -FILLET1_R), FILLET1_R, 90, 118.610459666)
            Line((FILLET1_R * 0.806646616735, -FILLET1_R * 1.47885213068), (0, 0))
            Line((0, 0), (FILLET1_R * 1.68454218965, 0))
        make_face()
    fillet1_piece_20 = extrude(amount=8.55, mode=Mode.PRIVATE)
    fillet1_piece_20 = split(fillet1_piece_20, bisect_by=Plane(origin=(56, 2.552378246, -19.075), z_dir=(-1, 0, 0)), keep=Keep.TOP, mode=Mode.PRIVATE)
    add(fillet1_piece_20)
    with BuildSketch(Plane(origin=(54, 2, -23.35), x_dir=(0.4788521306805727, 0.8778955729143846, 0), z_dir=(0, 0, 1))) as fillet1_piece_21_section:
        with BuildLine():
            CenterArc((FILLET1_R * 1.68454218965, -FILLET1_R), FILLET1_R, 90, 118.610459666)
            Line((FILLET1_R * 0.806646616735, -FILLET1_R * 1.47885213068), (0, 0))
            Line((0, 0), (FILLET1_R * 1.68454218965, 0))
        make_face()
    fillet1_piece_21 = extrude(amount=8.55, mode=Mode.PRIVATE)
    fillet1_piece_21 = split(fillet1_piece_21, bisect_by=Plane(origin=(56, 2.007259132, -19.075), z_dir=(1, 0, 0)), keep=Keep.TOP, mode=Mode.PRIVATE)
    add(fillet1_piece_21)
    with BuildSketch(Plane(origin=(54, 2, -23.35), x_dir=(0.4788521306805727, 0.8778955729143846, 0), z_dir=(0, 0, 1))) as fillet1_piece_22_section:
        with BuildLine():
            CenterArc((FILLET1_R * 1.68454218965, -FILLET1_R), FILLET1_R, 90, 118.610459666)
            Line((FILLET1_R * 0.806646616735, -FILLET1_R * 1.47885213068), (0, 0))
            Line((0, 0), (FILLET1_R * 1.68454218965, 0))
        make_face()
    fillet1_piece_22 = extrude(amount=14.867033211, mode=Mode.PRIVATE)
    fillet1_piece_22 = split(fillet1_piece_22, bisect_by=Plane(origin=(56.19558087, 2.007259132, -14.8), z_dir=(0, 0, 1)), keep=Keep.TOP, mode=Mode.PRIVATE)
    fillet1_piece_22 = split(fillet1_piece_22, bisect_by=Plane(origin=(56, 2.007259132, -11.641483394), z_dir=(1, 0, 0)), keep=Keep.TOP, mode=Mode.PRIVATE)
    add(fillet1_piece_22)

    # Sketch13 → Boss-Extrude7 (add)
    with BuildSketch(Plane(origin=(86, 0, 0), x_dir=(0, 0, -1), z_dir=(1, 0, 0))):
        with Locations((9.6, 19)):
            Rectangle(SKETCH13_W, SKETCH13_H)
    extrude(amount=BOSS_EXTRUDE7_DEPTH)

    # Sketch14 → Boss-Extrude8 (add)
    with BuildSketch(Plane(origin=(86, 0, 0), x_dir=(0, 0, -1), z_dir=(1, 0, 0))):
        with Locations((9.6, 10)):
            Rectangle(SKETCH14_W, SKETCH14_H)
    extrude(amount=BOSS_EXTRUDE8_DEPTH)

    # Sketch15 → Cut-Extrude5 (cut)
    with BuildSketch(Plane(origin=(93, 0, 0), x_dir=(0, 0, -1), z_dir=(1, 0, 0))):
        with Locations((9.6, 10)):
            Circle(SKETCH15_R)
    extrude(amount=-CUT_EXTRUDE5_DEPTH, mode=Mode.SUBTRACT)

    # Sketch16 → Cut-Extrude6 (cut)
    with BuildSketch(Plane(origin=(0, 28, 0), x_dir=(1, 0, 0), z_dir=(0, 1, 0))):
        with Locations((11.2, 9.6)):
            Rectangle(SKETCH16_W, SKETCH16_H)
    extrude(amount=-CUT_EXTRUDE6_DEPTH, mode=Mode.SUBTRACT)

    # Fillet2
    fillet2_edges = [part.edges().sort_by_distance(p)[0] for p in [
        (11.8, 8.3, 4.15),
        (11.8, 8.3, -23.35),
    ]]
    fillet(fillet2_edges, radius=FILLET2_R)


solid = part.part
